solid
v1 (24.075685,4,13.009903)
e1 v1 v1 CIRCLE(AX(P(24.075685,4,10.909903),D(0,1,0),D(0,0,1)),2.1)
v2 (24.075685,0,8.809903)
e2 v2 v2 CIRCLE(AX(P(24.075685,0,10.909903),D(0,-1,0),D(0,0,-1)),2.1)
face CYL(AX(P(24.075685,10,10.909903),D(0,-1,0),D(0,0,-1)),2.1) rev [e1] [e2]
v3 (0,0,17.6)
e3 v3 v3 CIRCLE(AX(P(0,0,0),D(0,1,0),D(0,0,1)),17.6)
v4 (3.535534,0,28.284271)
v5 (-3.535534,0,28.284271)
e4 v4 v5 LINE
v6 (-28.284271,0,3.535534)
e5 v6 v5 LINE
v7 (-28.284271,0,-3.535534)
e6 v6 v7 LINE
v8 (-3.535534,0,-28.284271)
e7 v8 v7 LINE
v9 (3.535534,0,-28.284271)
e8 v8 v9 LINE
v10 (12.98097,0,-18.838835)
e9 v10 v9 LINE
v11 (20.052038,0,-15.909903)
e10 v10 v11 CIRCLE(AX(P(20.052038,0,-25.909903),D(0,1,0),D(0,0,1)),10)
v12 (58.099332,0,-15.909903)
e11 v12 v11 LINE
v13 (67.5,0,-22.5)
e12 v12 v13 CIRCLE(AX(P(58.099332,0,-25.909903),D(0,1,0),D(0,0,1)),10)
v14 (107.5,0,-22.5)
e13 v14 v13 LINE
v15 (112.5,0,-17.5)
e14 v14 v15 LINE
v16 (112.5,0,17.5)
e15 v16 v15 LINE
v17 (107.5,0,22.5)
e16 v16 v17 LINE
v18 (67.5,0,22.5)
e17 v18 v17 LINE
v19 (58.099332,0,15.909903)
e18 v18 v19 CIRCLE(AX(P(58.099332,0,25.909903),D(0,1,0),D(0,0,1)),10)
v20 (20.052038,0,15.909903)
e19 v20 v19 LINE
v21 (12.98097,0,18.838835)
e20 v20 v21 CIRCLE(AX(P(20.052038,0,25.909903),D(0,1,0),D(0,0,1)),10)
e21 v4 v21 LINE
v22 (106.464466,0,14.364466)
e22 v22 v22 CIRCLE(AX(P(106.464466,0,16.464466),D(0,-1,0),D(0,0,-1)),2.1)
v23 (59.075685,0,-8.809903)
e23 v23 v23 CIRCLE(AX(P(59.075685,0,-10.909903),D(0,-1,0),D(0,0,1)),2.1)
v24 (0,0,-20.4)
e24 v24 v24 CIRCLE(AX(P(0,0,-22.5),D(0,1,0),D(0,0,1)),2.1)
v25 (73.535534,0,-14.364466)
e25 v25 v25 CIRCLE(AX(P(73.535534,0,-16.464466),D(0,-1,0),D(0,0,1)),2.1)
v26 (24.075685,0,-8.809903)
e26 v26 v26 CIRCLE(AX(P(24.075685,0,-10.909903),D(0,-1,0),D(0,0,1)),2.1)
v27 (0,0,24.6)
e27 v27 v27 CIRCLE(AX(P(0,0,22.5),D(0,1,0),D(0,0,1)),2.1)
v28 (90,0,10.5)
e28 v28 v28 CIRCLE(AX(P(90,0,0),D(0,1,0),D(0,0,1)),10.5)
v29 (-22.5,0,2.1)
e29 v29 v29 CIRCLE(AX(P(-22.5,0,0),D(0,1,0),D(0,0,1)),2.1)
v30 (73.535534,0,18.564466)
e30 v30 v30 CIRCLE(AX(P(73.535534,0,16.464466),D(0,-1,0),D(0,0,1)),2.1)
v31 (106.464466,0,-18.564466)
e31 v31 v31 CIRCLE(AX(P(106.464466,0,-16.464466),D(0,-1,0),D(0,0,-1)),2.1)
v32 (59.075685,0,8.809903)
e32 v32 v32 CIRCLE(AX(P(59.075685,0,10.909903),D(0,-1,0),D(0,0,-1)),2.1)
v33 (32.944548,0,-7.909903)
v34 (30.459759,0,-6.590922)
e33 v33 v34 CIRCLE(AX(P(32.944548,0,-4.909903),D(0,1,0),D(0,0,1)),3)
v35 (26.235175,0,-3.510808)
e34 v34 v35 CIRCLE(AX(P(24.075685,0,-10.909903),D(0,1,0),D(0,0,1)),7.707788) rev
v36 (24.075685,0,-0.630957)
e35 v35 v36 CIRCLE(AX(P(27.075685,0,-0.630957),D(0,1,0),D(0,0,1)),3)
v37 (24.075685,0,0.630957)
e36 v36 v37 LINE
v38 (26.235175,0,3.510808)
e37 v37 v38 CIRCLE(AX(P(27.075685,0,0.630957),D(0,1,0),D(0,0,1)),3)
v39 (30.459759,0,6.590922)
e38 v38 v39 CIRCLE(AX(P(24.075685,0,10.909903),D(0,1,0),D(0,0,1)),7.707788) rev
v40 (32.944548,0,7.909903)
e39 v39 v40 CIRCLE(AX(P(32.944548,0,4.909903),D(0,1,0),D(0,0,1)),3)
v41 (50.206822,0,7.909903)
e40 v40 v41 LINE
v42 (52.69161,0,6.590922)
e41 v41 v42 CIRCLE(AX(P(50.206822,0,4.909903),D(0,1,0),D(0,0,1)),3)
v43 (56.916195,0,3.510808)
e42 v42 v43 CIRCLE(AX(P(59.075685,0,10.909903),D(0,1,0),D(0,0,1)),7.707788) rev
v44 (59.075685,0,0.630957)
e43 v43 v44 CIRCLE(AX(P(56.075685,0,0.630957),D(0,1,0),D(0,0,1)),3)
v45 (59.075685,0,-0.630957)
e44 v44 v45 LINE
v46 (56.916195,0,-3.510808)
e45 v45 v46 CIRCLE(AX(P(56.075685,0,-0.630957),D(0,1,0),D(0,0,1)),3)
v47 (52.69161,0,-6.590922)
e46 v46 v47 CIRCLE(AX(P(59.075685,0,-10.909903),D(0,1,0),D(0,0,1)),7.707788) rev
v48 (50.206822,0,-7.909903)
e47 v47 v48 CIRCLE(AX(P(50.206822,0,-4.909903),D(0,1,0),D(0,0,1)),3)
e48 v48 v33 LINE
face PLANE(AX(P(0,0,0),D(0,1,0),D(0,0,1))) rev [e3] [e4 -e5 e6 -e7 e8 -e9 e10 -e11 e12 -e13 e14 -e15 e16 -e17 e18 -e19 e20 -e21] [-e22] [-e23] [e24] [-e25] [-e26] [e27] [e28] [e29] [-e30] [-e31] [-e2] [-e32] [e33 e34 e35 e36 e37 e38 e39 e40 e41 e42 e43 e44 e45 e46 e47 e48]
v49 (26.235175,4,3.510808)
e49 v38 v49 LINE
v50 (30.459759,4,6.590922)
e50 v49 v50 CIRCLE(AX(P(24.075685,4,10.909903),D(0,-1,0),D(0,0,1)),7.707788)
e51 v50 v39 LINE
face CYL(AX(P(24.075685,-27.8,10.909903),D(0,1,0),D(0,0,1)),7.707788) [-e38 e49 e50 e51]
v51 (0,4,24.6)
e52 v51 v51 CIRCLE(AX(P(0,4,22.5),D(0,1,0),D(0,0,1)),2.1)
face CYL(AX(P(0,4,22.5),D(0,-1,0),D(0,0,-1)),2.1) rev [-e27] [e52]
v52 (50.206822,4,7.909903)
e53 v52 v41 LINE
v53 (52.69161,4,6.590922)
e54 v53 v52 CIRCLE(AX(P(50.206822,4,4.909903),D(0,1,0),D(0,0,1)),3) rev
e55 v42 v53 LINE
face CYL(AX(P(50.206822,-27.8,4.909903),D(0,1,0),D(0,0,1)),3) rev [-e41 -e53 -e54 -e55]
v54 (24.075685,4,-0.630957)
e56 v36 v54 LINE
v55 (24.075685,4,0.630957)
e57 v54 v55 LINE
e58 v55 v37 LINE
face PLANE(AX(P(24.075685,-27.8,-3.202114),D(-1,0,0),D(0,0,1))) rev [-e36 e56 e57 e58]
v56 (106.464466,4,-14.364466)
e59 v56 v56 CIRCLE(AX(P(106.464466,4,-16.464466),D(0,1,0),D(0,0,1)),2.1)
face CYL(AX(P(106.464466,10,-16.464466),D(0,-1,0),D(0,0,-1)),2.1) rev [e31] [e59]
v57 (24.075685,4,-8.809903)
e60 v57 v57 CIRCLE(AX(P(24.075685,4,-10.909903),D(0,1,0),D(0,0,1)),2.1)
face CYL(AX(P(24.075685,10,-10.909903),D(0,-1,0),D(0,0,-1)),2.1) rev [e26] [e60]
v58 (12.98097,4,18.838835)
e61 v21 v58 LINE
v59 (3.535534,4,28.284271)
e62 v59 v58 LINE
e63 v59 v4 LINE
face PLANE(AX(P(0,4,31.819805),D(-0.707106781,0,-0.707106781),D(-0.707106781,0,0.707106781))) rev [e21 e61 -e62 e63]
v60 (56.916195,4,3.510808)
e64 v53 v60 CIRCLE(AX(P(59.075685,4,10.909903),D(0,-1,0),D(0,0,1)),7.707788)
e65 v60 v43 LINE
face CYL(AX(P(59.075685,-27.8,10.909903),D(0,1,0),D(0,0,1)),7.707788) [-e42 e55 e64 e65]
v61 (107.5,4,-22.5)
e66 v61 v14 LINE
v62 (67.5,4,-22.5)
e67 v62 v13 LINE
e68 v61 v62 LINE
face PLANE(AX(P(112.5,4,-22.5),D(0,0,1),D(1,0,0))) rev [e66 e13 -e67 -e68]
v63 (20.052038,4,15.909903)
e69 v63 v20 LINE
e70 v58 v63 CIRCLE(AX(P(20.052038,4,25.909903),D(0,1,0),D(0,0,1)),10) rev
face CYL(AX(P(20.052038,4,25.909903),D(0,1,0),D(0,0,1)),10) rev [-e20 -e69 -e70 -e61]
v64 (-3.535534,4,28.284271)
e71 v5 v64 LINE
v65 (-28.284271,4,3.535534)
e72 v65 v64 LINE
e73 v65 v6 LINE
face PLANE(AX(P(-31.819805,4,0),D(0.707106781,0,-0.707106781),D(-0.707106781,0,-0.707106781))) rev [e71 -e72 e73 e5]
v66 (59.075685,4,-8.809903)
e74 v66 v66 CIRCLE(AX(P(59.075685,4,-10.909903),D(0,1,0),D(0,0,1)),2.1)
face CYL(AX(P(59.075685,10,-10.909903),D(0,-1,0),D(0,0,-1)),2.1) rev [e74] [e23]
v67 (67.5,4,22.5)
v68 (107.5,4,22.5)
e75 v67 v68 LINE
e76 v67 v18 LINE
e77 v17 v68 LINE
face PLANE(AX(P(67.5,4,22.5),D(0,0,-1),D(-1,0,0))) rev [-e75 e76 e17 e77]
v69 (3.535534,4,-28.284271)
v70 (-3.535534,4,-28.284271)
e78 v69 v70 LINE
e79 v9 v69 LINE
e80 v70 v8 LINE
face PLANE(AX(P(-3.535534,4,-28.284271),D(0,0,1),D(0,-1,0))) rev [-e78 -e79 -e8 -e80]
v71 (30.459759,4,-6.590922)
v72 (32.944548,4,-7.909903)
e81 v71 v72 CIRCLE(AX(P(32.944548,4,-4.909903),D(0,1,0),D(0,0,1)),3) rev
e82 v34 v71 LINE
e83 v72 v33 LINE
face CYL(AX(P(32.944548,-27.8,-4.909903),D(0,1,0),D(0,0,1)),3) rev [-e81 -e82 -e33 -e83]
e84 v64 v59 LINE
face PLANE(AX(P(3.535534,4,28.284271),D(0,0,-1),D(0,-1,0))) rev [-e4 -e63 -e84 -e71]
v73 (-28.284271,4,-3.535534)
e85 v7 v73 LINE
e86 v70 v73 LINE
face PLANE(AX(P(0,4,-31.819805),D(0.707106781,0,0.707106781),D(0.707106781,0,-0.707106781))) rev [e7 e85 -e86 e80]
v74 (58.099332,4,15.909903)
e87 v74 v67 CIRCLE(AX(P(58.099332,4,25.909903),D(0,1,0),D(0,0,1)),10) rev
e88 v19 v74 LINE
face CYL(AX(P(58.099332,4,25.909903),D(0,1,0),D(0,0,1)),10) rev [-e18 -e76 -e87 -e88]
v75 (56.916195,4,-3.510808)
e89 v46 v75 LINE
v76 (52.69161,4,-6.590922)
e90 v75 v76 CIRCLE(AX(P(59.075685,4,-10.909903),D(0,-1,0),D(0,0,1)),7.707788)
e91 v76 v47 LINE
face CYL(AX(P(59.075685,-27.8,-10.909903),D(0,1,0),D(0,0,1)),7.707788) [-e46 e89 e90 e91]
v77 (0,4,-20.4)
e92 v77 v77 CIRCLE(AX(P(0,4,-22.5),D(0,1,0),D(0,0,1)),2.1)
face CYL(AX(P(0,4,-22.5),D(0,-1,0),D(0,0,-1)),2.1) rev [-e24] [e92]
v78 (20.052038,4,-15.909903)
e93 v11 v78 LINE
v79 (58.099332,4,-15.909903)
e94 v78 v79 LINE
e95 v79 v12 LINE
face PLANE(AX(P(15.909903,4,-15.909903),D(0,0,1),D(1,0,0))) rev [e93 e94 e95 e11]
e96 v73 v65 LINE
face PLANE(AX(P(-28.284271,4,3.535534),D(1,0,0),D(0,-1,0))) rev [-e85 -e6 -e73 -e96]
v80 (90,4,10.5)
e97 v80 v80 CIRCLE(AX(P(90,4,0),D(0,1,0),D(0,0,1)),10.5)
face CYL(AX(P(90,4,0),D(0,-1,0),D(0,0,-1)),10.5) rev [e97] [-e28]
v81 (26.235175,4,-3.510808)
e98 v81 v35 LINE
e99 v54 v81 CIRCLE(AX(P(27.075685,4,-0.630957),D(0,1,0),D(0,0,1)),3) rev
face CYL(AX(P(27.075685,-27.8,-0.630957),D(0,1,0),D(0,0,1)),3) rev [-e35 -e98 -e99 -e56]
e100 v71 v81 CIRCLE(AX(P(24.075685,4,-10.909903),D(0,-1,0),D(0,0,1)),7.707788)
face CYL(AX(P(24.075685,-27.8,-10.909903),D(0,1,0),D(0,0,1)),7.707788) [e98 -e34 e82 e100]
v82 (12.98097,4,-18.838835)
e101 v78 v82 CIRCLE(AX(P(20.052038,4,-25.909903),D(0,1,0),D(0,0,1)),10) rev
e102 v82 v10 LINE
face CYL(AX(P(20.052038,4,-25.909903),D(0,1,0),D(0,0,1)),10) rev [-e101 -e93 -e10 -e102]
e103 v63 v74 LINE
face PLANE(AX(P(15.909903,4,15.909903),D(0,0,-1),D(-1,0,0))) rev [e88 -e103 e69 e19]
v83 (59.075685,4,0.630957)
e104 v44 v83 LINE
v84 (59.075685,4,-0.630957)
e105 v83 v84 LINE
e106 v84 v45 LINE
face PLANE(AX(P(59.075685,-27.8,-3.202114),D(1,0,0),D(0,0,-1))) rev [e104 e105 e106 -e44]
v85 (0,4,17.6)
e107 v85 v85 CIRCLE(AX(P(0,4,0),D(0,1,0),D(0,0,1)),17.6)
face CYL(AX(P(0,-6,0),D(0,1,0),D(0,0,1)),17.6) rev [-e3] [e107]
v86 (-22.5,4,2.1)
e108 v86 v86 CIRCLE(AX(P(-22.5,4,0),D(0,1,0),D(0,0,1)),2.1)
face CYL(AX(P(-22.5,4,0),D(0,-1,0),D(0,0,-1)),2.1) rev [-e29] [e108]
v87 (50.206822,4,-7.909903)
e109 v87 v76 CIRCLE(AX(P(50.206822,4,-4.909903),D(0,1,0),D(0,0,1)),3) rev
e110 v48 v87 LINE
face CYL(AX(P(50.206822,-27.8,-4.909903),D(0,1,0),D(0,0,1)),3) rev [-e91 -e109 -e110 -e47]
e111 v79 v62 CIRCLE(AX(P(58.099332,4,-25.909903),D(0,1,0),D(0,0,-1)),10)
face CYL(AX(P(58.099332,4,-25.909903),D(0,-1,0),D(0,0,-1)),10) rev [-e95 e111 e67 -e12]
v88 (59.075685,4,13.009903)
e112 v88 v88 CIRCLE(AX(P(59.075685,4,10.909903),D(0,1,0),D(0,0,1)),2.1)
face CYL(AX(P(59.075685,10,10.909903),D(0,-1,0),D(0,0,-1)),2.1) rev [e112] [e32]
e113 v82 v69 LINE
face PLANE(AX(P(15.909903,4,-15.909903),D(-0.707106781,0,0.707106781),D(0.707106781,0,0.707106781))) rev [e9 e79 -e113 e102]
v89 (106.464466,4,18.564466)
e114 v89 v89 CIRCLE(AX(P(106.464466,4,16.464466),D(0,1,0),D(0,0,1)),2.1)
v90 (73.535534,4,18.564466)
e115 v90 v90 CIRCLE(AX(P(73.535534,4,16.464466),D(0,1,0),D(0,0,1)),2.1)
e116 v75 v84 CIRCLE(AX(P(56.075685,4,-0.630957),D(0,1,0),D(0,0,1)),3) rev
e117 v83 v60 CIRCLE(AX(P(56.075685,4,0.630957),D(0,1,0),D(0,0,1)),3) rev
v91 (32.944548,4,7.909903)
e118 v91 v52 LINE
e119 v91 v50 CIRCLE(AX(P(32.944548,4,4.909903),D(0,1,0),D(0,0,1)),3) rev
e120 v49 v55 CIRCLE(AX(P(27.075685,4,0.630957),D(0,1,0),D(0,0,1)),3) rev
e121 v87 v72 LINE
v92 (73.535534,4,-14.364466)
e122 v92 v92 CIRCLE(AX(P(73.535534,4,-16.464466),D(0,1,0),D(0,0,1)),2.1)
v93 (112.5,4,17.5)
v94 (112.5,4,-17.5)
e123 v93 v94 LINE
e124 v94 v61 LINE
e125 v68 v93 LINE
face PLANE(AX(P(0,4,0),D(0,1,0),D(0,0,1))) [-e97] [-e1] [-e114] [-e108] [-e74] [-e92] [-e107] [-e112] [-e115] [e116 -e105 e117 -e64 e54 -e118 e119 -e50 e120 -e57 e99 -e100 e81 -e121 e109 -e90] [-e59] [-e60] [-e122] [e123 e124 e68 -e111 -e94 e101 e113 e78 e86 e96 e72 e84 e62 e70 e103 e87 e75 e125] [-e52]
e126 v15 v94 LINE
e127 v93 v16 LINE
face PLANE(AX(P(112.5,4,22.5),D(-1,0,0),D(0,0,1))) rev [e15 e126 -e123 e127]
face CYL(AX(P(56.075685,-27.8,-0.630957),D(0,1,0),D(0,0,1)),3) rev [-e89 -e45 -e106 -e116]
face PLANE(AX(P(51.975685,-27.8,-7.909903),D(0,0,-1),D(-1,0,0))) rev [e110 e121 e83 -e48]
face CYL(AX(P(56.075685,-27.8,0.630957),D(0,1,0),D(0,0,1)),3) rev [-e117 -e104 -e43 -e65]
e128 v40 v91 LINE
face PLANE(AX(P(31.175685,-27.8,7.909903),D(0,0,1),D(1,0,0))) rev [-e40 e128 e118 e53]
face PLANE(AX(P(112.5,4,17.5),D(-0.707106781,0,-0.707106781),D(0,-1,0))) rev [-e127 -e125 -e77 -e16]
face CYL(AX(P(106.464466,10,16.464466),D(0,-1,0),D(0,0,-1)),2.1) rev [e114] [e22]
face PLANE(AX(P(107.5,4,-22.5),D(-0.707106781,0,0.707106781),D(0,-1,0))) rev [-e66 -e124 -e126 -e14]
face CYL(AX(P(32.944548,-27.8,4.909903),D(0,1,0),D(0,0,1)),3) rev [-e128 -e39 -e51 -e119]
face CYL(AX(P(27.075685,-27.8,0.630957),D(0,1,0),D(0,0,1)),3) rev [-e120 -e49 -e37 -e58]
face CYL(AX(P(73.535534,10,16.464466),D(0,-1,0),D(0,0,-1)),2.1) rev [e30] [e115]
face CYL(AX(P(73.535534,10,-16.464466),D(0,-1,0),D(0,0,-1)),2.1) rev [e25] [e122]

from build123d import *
from OCP.BRepFilletAPI import BRepFilletAPI_MakeChamfer

# Parameters (mm, degrees)
SKETCH_1_R          = 2.1
SKETCH_1_R_2        = 10.5
SKETCH_1_R_3        = 10
EXTRUDE_1_DEPTH     = 4
CHAMFER_1_SIZE      = 5
FILLET_1_R          = 10
SKETCH_2_R          = 2.1
CUT_EXTRUDE_1_DEPTH = 10
SKETCH_3_R          = 1.6
EXTRUDE_2_DEPTH     = 3
SKETCH_4_R          = 17.6
CUT_EXTRUDE_2_DEPTH = 10
CUT_EXTRUDE_3_DEPTH = 31.8
FILLET_6_R          = 3
FILLET_7_R          = 4
EXTRUDE_START       = -3
EXTRUDE_3_DEPTH     = 3
FILLET_8_R          = 4
CHAMFER_4_SIZE      = 15
CHAMFER_4_SIZE2     = 22.404226252
CUT_EXTRUDE_4_DEPTH = 3
FILLET_11_R         = 5
EXTRUDE_4_DEPTH     = 3
FILLET_12_R         = 5
CHAMFER_5_SIZE      = 1.5
CHAMFER_5_SIZE2     = 1.429177646
CHAMFER_5_SIZE2_2   = 1.610271544
CUT_EXTRUDE_START   = -10
CUT_EXTRUDE_5_DEPTH = 10


with BuildPart() as part:
    # 草图1 → 凸台-拉伸1 (new body)
    with BuildSketch(Plane(origin=(0, 0, 0), x_dir=(1, 0, 0), z_dir=(0, 1, 0))):
        Polygon((0, 31.819805153), (-31.819805153, 0), (0, -31.819805153), (15.909902577, -15.909902577), (67.5, -15.909902577), (67.5, -22.5), (112.5, -22.5), (112.5, 22.5), (67.5, 22.5), (67.5, 15.909902577), (15.909902577, 15.909902577), align=None)
        with Locations(Location((0, 14, 0), (0, 0, 270))):
            Circle(SKETCH_1_R, mode=Mode.SUBTRACT)
        with Locations(Location((14, 0, 0), (0, 0, 270))):
            Circle(SKETCH_1_R, mode=Mode.SUBTRACT)
        with Locations(Location((0, -14, 0), (0, 0, 270))):
            Circle(SKETCH_1_R, mode=Mode.SUBTRACT)
        with Locations(Location((-14, 0, 0), (0, 0, 270))):
            Circle(SKETCH_1_R, mode=Mode.SUBTRACT)
        with Locations(Location((90, 0, 0), (0, 0, 270))):
            Circle(SKETCH_1_R_2, mode=Mode.SUBTRACT)
        with Locations(Location((0, 22.5, 0), (0, 0, 270))):
            Circle(SKETCH_1_R, mode=Mode.SUBTRACT)
        with Locations(Location((0, -22.5, 0), (0, 0, 270))):
            Circle(SKETCH_1_R, mode=Mode.SUBTRACT)
        with Locations(Location((0, 0, 0), (0, 0, 270))):
            Circle(SKETCH_1_R_3, mode=Mode.SUBTRACT)
        with Locations(Location((-22.5, 0, 0), (0, 0, 270))):
            Circle(SKETCH_1_R, mode=Mode.SUBTRACT)
    extrude(amount=EXTRUDE_1_DEPTH)

    # 倒角1
    chamfer_1_edges = [part.edges().sort_by_distance(p)[0] for p in [
        (112.5, 2, -22.5),
        (112.5, 2, 22.5),
        (0, 2, 31.819805153),
        (-31.819805153, 2, 0),
        (0, 2, -31.819805153),
    ]]
    chamfer(chamfer_1_edges, length=CHAMFER_1_SIZE)

    # 圆角1
    # the kernel refuses this fillet: 10 mm, written as the material it adds along each edge
    with BuildSketch(Plane(origin=(15.909902577, 0, -15.909902577), x_dir=(-0.707106781186552, 0, -0.707106781186543), z_dir=(0, 1, 0))) as fillet_1_piece_1:
        with BuildLine():
            CenterArc((FILLET_1_R * 0.414213562373, -FILLET_1_R), FILLET_1_R, 90, 45)
            Line((-FILLET_1_R * 0.292893218813, -FILLET_1_R * 0.292893218813), (-FILLET_1_R * 0.307035354437, -FILLET_1_R * 0.27875108319))
            Line((-FILLET_1_R * 0.307035354437, -FILLET_1_R * 0.27875108319), (-FILLET_1_R * 0.00828427124746, FILLET_1_R * 0.02))
            Line((-FILLET_1_R * 0.00828427124746, FILLET_1_R * 0.02), (FILLET_1_R * 0.414213562373, FILLET_1_R * 0.02))
            Line((FILLET_1_R * 0.414213562373, FILLET_1_R * 0.02), (FILLET_1_R * 0.414213562373, 0))
        make_face()
    extrude(amount=4)
    with BuildSketch(Plane(origin=(15.909902577, 0, 15.909902577), x_dir=(-0.7071067811865422, 0, 0.707106781186553), z_dir=(0, 1, 0))) as fillet_1_piece_2:
        with BuildLine():
            CenterArc((FILLET_1_R * 0.414213562373, FILLET_1_R), FILLET_1_R, 225, 45)
            Line((-FILLET_1_R * 0.292893218813, FILLET_1_R * 0.292893218813), (-FILLET_1_R * 0.307035354437, FILLET_1_R * 0.27875108319))
            Line((-FILLET_1_R * 0.307035354437, FILLET_1_R * 0.27875108319), (-FILLET_1_R * 0.00828427124746, -FILLET_1_R * 0.02))
            Line((-FILLET_1_R * 0.00828427124746, -FILLET_1_R * 0.02), (FILLET_1_R * 0.414213562373, -FILLET_1_R * 0.02))
            Line((FILLET_1_R * 0.414213562373, -FILLET_1_R * 0.02), (FILLET_1_R * 0.414213562373, 0))
        make_face()
    extrude(amount=4)
    with BuildSketch(Plane(origin=(67.5, 0, 15.909902577), x_dir=(-1, 0, 0), z_dir=(0, 1, 0))) as fillet_1_piece_3:
        with BuildLine():
            CenterArc((9.400668296, 10), FILLET_1_R, 199.937217397, 70.062782603)
            Line((0, 6.590097423), (-0.188013366, 6.521899372))
            ThreePointArc((-0.188013366, 6.521899372), (-0.2, 3.295048712), (-0.2, 0))
            Line((-0.2, 0), (0, -0.2))
            Line((0, -0.2), (9.400668296, -0.2))
            Line((9.400668296, -0.2), (9.400668296, 0))
        make_face()
    extrude(amount=4)
    with BuildSketch(Plane(origin=(67.5, 0, -15.909902577), x_dir=(-1, 0, 0), z_dir=(0, 1, 0))) as fillet_1_piece_4:
        with BuildLine():
            CenterArc((9.400668296, -10), FILLET_1_R, 90, 70.062782603)
            Line((0, -6.590097423), (-0.188013366, -6.521899372))
            ThreePointArc((-0.188013366, -6.521899372), (-0.2, -3.295048712), (-0.2, 0))
            Line((-0.2, 0), (0, 0.2))
            Line((0, 0.2), (9.400668296, 0.2))
            Line((9.400668296, 0.2), (9.400668296, 0))
        make_face()
    extrude(amount=4)

    # 草图2 → 切除-拉伸1 (cut)
    with BuildSketch(Plane.XZ):
        with Locations(Location((106.464466094, 16.464466094, 0), (0, 0, 270))):
            Circle(SKETCH_2_R)
        with Locations(Location((106.464466094, -16.464466094, 0), (0, 0, 270))):
            Circle(SKETCH_2_R)
        with Locations(Location((73.535533906, -16.464466094, 0), (0, 0, 90))):
            Circle(SKETCH_2_R)
        with Locations(Location((73.535533906, 16.464466094, 0), (0, 0, 90))):
            Circle(SKETCH_2_R)
        with Locations(Location((24.075684952, 10.909902577, 0), (0, 0, 270))):
            Circle(SKETCH_2_R)
        with Locations(Location((59.075684952, 10.909902577, 0), (0, 0, 270))):
            Circle(SKETCH_2_R)
        with Locations(Location((59.075684952, -10.909902577, 0), (0, 0, 90))):
            Circle(SKETCH_2_R)
        with Locations(Location((24.075684952, -10.909902577, 0), (0, 0, 90))):
            Circle(SKETCH_2_R)
    extrude(amount=-CUT_EXTRUDE_1_DEPTH, mode=Mode.SUBTRACT)

    # 草图3 → 凸台-拉伸2 (add)
    with BuildSketch(Plane(origin=(0, 4, 0), x_dir=(1, 0, 0), z_dir=(0, 1, 0))):
        Polygon((74.689031721, 83.86671265), (39.075684952, 15.909902577), (49.236670423, 15.909902577), (78, 70.795621063), (98.581853944, 22.5), (107.5, 22.5), (81.347717681, 83.86671265), align=None)
        with Locations(Location((78, 77.942286341, 0), (0, 0, 270))):
            Circle(SKETCH_3_R, mode=Mode.SUBTRACT)
    extrude(amount=-EXTRUDE_2_DEPTH)

    # 草图4 → 切除-拉伸2 (cut)
    with BuildSketch(Plane(origin=(0, 4, 0), x_dir=(1, 0, 0), z_dir=(0, 1, 0))):
        with Locations(Location((0, 0, 0), (0, 0, 270))):
            Circle(SKETCH_4_R)
    extrude(amount=-CUT_EXTRUDE_2_DEPTH, mode=Mode.SUBTRACT)

    # 草图5 → 切除-拉伸3 (cut)
    with BuildSketch(Plane(origin=(0, 4, 0), x_dir=(1, 0, 0), z_dir=(0, 1, 0))):
        with BuildLine():
            Line((24.075684952, 3.202114308), (24.075684952, -3.202114308))
            ThreePointArc((24.075684952, -3.202114308), (28.335182293, -4.485987695), (31.175684952, -7.909902577))
            Line((31.175684952, -7.909902577), (51.975684952, -7.909902577))
            ThreePointArc((51.975684952, -7.909902577), (54.816187611, -4.485987695), (59.075684952, -3.202114308))
            Line((59.075684952, -3.202114308), (59.075684952, 3.202114308))
            ThreePointArc((59.075684952, 3.202114308), (54.816187611, 4.485987695), (51.975684952, 7.909902577))
            Line((51.975684952, 7.909902577), (31.175684952, 7.909902577))
            ThreePointArc((31.175684952, 7.909902577), (28.335182293, 4.485987695), (24.075684952, 3.202114308))
        make_face()
    extrude(amount=-CUT_EXTRUDE_3_DEPTH, mode=Mode.SUBTRACT)

    # 圆角6
    fillet_6_edges = [part.edges().sort_by_distance(p)[0] for p in [
        (24.075684952, 2, -3.202114308),
        (31.175684952, 2, -7.909902577),
        (51.975684952, 2, -7.909902577),
        (59.075684952, 2, -3.202114308),
        (59.075684952, 2, 3.202114308),
        (51.975684952, 2, 7.909902577),
        (31.175684952, 2, 7.909902577),
        (24.075684952, 2, 3.202114308),
    ]]
    fillet(fillet_6_edges, radius=FILLET_6_R)

    # 圆角7
    fillet_7_edges = [part.edges().sort_by_distance(p)[0] for p in [
        (49.236670423, 2.5, -15.909902577),
    ]]
    fillet(fillet_7_edges, radius=FILLET_7_R)

    # 草图6 → 凸台-拉伸3 (add)
    with BuildSketch(Plane(origin=(0, 4, 0), x_dir=(1, 0, 0), z_dir=(0, 1, 0)).offset(EXTRUDE_START)):
        with BuildLine():
            Line((67.5, 22.5), (52.690267267, 22.5))
            Line((52.690267267, 22.5), (52.305934696, 21.766622828))
            ThreePointArc((52.305934696, 21.766622828), (52.426407737, 17.83950177), (55.848898132, 15.909902577))
            Line((55.848898132, 15.909902577), (58.099331704, 15.909902577))
            ThreePointArc((58.099331704, 15.909902577), (63.839583189, 17.721525883), (67.5, 22.5))
        make_face()
    extrude(amount=EXTRUDE_3_DEPTH)

    # 圆角8
    fillet_8_edges = [part.edges().sort_by_distance(p)[0] for p in [
        (98.581853944, 2.5, -22.5),
        (78, 2.5, -70.795621063),
        (52.690267267, 2.5, -22.5),
    ]]
    fillet(fillet_8_edges, radius=FILLET_8_R)

    # 倒角4
    chamfer_4_edges = [part.edges().sort_by_distance(p)[0] for p in [
        (39.075684952, 2.5, -15.909902577),
    ]]
    chamfer_4_side = [part.faces().sort_by_distance(p)[0] for p in [
        (33.368590927, 1.7, -15.909902577),
    ]]
    chamfer(chamfer_4_edges, length=CHAMFER_4_SIZE, length2=CHAMFER_4_SIZE2, reference=chamfer_4_side[0])

    # 草图7 → 切除-拉伸4 (cut)
    with BuildSketch(Plane(origin=(0, 4, 0), x_dir=(1, 0, 0), z_dir=(0, 1, 0))):
        with BuildLine():
            Line((32.197031179, 15.909902577), (56.151580128, 15.909902577))
            Line((56.151580128, 15.909902577), (59.302494975, 17.5))
            ThreePointArc((59.302494975, 17.5), (51.509584112, 21.997718325), (51.505632804, 30.995435494))
            Line((51.505632804, 30.995435494), (32.197031179, 15.909902577))
        make_face()
    extrude(amount=-CUT_EXTRUDE_4_DEPTH, mode=Mode.SUBTRACT)

    # 圆角11
    fillet_11_edges = [part.edges().sort_by_distance(p)[0] for p in [
        (49.475280099, 2.5, -35.754241184),
        (24.075684952, 2.5, -15.909902577),
    ]]
    fillet(fillet_11_edges, radius=FILLET_11_R)

    # 草图8 → 凸台-拉伸4 (add)
    with BuildSketch(Plane(origin=(0, 4, 0), x_dir=(1, 0, 0), z_dir=(0, 1, 0))):
        Polygon((81.347717681, 83.86671265), (83.347717681, 83.86671265), (85.253411001, 74.701946198), align=None)
        Polygon((74.689031721, 83.86671265), (72.689031721, 83.86671265), (69.886157582, 74.701946198), align=None)
    extrude(amount=-EXTRUDE_4_DEPTH)

    # 圆角12
    fillet_12_edges = [part.edges().sort_by_distance(p)[0] for p in [
        (85.253411001, 2.5, -74.701946198),
        (69.886157582, 2.5, -74.701946198),
    ]]
    fillet(fillet_12_edges, radius=FILLET_12_R)

    # 倒角5: one chamfer whose edges measure the first distance from different faces: ONE call of the kernel's chamfer builder (chamfer() names one face for all edges)
    chamfer_5_edges_1 = [part.edges().sort_by_distance(p)[0] for p in [
        (83.347717681, 2.5, -83.86671265),
    ]]
    chamfer_5_side_1 = [part.faces().sort_by_distance(p)[0] for p in [
        (78.018374701, 2.5, -83.86671265),
    ]]
    chamfer_5_edges_2 = [part.edges().sort_by_distance(p)[0] for p in [
        (72.689031721, 2.5, -83.86671265),
    ]]
    chamfer_5_side_2 = [part.faces().sort_by_distance(p)[0] for p in [
        (71.355755289, 2.5, -79.50719934),
    ]]
    chamfer_5 = BRepFilletAPI_MakeChamfer(part.part.solid().wrapped)
    for e in chamfer_5_edges_1:
        chamfer_5.Add(CHAMFER_5_SIZE, CHAMFER_5_SIZE2, e.wrapped, chamfer_5_side_1[0].wrapped)  # the first distance lies on this face
    for e in chamfer_5_edges_2:
        chamfer_5.Add(CHAMFER_5_SIZE, CHAMFER_5_SIZE2_2, e.wrapped, chamfer_5_side_2[0].wrapped)  # the first distance lies on this face
    add(Compound.cast(chamfer_5.Shape()), mode=Mode.REPLACE)

    # 草图9 → 切除-拉伸5 (cut)
    with BuildSketch(Plane(origin=(0, 4, 0), x_dir=(1, 0, 0), z_dir=(0, 1, 0)).offset(CUT_EXTRUDE_START)):
        with BuildLine():
            Line((22.354046886, 15.909902577), (58.099331704, 15.909902577))
            ThreePointArc((58.099331704, 15.909902577), (63.839583189, 17.721525883), (67.5, 22.5))
            Line((67.5, 22.5), (112.713100818, 22.5))
            Line((112.713100818, 22.5), (128.205404221, 15.909902577))
            Line((128.205404221, 15.909902577), (92.949872776, 93.149070556))
            Line((92.949872776, 93.149070556), (54.968117123, 93.149070556))
            Line((54.968117123, 93.149070556), (22.354046886, 15.909902577))
        make_face()
    extrude(amount=CUT_EXTRUDE_5_DEPTH, mode=Mode.SUBTRACT)


solid = part.part
